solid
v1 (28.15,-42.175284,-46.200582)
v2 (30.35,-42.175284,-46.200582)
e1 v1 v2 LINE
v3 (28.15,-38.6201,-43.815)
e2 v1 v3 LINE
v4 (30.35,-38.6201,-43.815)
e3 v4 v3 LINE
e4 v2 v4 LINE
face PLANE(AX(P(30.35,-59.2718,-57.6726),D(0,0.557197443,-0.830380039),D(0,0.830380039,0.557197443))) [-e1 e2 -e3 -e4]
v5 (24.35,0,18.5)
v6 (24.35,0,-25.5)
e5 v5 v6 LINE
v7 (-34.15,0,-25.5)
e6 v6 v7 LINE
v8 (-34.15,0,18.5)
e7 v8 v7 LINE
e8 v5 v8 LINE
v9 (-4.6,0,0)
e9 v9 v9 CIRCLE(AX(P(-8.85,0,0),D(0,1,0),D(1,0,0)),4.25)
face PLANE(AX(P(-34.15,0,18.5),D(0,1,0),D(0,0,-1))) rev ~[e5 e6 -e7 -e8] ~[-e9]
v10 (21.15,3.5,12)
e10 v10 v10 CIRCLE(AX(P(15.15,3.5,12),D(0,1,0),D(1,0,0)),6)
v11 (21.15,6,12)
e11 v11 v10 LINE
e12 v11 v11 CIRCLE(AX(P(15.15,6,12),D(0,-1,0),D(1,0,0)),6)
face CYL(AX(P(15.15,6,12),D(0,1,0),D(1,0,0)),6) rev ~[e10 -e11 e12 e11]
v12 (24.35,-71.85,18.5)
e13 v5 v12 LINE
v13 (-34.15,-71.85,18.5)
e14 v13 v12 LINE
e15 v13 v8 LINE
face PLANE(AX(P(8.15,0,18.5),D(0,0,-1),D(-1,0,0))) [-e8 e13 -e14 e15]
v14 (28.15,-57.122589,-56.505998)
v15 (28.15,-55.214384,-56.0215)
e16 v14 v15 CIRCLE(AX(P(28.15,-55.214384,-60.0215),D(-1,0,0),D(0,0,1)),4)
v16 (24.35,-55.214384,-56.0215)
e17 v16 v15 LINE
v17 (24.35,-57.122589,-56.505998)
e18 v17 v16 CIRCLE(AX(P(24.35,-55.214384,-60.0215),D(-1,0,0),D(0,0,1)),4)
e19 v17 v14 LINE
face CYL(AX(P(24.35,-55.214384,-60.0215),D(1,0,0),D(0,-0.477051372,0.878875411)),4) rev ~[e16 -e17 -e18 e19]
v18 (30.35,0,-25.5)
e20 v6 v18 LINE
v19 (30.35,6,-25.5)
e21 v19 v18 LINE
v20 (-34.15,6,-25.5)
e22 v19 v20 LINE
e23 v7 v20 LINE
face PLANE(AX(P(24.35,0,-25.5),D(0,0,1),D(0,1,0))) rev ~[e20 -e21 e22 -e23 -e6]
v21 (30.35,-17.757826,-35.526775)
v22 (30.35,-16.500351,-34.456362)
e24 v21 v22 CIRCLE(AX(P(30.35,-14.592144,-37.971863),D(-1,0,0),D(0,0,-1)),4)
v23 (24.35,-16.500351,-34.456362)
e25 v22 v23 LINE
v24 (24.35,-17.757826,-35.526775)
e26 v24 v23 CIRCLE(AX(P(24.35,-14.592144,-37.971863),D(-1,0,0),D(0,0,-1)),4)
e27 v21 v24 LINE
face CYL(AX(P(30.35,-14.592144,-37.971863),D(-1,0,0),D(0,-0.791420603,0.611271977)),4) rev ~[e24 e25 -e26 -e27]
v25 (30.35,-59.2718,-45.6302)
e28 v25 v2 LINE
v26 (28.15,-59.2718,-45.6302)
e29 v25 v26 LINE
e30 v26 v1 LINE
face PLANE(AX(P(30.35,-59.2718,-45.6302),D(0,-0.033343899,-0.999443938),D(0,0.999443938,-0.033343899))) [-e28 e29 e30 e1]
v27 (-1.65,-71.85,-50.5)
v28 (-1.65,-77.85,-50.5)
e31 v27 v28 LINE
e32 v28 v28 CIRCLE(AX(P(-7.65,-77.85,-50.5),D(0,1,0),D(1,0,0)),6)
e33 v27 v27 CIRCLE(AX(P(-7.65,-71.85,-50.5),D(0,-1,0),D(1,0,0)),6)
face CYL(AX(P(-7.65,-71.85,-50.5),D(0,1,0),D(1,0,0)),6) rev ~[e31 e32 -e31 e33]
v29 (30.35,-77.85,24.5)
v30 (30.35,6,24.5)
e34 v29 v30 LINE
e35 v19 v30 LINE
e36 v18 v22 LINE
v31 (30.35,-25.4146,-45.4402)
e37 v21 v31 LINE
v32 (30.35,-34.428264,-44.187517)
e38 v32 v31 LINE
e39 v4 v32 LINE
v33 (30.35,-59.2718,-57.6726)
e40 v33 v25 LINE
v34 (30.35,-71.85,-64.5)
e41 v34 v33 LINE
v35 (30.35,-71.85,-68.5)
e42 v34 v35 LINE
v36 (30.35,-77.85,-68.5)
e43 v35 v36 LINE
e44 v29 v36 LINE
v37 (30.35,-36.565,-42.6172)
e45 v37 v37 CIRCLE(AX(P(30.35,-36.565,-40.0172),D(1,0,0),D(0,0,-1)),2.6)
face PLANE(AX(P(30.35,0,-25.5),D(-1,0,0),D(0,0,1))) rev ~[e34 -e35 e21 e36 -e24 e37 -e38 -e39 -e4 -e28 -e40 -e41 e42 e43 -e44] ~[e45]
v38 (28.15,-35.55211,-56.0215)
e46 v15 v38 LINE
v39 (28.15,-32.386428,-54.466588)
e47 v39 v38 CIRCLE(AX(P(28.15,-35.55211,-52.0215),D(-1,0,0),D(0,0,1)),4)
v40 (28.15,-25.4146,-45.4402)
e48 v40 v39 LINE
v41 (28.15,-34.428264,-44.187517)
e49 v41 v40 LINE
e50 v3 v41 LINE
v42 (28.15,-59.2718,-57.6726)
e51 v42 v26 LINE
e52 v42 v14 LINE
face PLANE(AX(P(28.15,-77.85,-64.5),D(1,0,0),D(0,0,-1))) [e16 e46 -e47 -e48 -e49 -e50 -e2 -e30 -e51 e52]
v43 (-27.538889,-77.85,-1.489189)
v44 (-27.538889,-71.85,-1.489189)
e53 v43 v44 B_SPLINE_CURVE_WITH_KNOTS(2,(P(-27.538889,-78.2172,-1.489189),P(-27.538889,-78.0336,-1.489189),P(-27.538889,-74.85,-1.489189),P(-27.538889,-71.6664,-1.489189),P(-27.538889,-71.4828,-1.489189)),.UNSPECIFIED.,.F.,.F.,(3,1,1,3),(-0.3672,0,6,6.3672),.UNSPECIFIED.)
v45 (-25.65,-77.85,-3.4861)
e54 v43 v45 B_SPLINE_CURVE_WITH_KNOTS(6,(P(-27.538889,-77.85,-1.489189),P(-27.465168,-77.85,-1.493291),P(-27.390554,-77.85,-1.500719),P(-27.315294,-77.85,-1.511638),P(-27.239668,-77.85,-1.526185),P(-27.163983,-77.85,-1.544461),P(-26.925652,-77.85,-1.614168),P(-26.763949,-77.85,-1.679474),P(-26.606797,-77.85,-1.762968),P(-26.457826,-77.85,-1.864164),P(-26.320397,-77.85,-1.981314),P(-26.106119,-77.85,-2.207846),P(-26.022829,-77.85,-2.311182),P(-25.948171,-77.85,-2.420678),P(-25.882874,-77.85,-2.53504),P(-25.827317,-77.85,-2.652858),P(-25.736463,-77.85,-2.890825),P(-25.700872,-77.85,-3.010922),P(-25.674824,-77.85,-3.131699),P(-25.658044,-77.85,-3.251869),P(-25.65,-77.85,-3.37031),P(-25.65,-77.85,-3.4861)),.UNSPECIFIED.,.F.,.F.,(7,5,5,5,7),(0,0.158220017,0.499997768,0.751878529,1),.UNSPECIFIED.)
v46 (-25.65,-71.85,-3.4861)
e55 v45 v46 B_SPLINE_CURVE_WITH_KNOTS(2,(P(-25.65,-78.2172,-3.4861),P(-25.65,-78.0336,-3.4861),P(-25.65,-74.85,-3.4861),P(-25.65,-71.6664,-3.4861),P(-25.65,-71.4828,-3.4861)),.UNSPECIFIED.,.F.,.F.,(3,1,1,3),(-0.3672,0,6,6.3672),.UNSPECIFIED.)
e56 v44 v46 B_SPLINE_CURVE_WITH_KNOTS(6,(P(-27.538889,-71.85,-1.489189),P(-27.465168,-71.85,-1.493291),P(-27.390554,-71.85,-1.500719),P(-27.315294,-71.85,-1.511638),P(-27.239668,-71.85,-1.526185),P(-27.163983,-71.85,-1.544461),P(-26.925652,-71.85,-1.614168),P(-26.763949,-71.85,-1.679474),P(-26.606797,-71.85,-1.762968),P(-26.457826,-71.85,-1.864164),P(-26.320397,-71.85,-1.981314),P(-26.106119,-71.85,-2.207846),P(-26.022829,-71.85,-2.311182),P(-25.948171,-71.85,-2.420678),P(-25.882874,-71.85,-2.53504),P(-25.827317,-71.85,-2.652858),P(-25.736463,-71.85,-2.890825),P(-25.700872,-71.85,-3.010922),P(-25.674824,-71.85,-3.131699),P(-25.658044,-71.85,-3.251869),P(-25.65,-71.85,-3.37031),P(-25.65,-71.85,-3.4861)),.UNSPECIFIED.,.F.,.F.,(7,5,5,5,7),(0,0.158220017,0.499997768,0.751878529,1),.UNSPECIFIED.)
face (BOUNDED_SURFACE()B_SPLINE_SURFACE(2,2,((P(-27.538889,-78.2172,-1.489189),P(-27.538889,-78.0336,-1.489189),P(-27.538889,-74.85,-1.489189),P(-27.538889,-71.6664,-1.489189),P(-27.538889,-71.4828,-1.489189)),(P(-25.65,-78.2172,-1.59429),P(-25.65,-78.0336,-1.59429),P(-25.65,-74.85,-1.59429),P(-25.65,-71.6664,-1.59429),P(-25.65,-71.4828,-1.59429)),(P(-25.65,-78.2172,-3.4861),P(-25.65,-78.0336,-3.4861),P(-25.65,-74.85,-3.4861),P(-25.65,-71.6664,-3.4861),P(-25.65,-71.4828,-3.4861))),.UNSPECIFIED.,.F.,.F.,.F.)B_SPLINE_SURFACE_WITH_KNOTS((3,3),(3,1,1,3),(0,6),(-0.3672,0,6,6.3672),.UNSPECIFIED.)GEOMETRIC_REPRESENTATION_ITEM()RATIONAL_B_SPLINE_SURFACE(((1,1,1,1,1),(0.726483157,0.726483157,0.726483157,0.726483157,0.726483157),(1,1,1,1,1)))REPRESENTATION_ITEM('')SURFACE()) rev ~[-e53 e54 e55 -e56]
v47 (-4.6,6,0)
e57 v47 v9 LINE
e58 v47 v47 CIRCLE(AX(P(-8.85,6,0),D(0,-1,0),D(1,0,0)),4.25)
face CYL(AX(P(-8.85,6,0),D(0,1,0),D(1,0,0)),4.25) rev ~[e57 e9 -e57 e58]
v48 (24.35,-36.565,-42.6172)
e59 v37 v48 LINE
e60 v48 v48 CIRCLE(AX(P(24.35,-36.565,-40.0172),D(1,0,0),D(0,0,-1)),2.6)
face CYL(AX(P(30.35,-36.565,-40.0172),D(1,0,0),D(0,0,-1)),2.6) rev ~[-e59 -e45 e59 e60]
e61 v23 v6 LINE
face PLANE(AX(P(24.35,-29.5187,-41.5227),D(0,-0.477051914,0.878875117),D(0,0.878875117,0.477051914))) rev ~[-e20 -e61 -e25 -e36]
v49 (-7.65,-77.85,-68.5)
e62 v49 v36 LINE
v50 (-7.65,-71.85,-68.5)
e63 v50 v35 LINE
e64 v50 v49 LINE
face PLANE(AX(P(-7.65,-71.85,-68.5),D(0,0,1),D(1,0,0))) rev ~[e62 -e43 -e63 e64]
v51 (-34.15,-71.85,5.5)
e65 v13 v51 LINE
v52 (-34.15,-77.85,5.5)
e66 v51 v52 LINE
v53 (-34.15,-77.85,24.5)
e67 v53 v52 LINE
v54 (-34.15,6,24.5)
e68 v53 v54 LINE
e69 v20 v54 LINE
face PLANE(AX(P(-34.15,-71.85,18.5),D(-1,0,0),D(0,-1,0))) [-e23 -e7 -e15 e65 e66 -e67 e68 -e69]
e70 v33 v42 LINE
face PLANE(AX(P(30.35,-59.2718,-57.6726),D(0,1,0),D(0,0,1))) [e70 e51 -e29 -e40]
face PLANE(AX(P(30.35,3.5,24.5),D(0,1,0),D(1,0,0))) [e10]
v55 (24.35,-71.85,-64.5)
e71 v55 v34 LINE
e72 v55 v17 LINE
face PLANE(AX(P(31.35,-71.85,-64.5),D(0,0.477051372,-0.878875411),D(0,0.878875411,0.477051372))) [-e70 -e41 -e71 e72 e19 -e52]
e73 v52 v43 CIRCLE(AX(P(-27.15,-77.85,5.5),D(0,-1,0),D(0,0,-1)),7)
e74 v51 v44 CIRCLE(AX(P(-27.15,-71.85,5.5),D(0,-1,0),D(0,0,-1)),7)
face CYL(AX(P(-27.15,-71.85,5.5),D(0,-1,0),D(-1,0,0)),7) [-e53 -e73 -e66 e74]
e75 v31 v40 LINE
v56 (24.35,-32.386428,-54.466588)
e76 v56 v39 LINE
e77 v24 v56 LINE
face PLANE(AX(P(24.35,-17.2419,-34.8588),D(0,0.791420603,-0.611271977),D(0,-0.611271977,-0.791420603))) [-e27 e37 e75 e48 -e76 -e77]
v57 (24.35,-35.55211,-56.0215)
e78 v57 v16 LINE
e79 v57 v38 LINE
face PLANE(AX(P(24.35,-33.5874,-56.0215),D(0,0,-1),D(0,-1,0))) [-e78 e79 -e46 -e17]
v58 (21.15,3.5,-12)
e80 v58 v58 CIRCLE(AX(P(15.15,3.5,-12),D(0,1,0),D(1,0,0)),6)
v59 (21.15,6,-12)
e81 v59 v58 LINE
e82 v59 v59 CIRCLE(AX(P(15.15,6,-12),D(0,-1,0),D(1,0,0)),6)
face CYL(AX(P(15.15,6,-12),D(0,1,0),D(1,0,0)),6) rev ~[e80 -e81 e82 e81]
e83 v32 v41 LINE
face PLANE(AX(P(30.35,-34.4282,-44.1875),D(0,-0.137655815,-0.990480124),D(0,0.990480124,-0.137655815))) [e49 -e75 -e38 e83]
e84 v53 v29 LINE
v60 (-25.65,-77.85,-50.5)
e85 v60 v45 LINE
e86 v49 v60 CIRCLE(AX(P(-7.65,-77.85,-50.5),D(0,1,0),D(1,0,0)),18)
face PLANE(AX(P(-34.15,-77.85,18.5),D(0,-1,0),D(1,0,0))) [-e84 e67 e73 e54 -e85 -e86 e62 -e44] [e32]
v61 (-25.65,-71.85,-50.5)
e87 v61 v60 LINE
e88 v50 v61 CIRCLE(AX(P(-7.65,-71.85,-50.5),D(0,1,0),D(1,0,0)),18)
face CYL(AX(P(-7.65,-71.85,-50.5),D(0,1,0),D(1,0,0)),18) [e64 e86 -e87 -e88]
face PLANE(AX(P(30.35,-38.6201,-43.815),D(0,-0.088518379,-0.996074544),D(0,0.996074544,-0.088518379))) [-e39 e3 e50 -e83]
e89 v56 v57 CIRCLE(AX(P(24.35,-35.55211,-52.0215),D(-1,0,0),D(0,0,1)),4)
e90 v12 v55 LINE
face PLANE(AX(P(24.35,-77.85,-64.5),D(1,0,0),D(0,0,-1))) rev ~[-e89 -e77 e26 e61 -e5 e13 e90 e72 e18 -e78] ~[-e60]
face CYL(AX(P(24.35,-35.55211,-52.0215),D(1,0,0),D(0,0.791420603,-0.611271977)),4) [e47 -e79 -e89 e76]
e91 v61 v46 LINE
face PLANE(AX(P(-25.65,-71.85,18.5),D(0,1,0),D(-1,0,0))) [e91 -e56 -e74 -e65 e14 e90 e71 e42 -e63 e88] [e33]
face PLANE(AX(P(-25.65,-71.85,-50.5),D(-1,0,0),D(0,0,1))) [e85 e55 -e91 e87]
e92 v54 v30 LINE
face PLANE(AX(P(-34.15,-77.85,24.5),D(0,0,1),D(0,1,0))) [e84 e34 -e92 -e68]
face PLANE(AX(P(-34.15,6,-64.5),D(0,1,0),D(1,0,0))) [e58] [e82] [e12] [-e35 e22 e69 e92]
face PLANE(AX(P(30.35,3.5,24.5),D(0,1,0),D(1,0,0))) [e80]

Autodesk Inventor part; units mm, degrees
ref_plane "YZ Plane" through (0, 0, 0) normal (1, 0, 0) x (0, 1, 0)
ref_plane "XZ Plane" through (0, 0, 0) normal (0, 1, 0) x (-1, 0, 0)
ref_plane "XY Plane" through (0, 0, 0) normal (0, 0, 1) x (1, 0, 0)
sketch "Sketch1" plane through (0, 0, 0) normal (0, 1, 0) x (-1, 0, 0)
  line L0 (0, -25.5) -> (-34.15, -25.5)
  line L1 (-34.15, -25.5) -> (-34.15, 0)
  line L2 (-34.15, 0) -> (-34.15, 25.5)
  line L3 (-34.15, 25.5) -> (0, 25.5)
  line L4 (0, 25.5) -> (34.15, 25.5)
  line L5 (34.15, 25.5) -> (34.15, 0)
  line L6 (34.15, 0) -> (34.15, -25.5)
  line L7 (34.15, -25.5) -> (0, -25.5)
  point P0 (0, 0)
extrude "Extrusion1" add sketch "Sketch1" along normal blind 7
sketch "Sketch3" plane through (-34.15, 0, 25.5) normal (0, 0, 1) x (1, 0, 0)
  line L0 (0, 0) -> (0, -78.85)
  point P0 (34.15, 0)
  dimension "d7" = 78.85
sketch "Sketch4" plane through (-34.15, 0, -25.5) normal (-1, 0, 0) x (0, 0, 1)
  line L0 (51, 0) -> (51, -78.85)
  line L1 (51, -78.85) -> (-39, -78.85)
  line L2 (-39, -78.85) -> (-39, -71.85)
  line L3 (0, 0) -> (-39, -71.85)
  line L4 (0, 0) -> (51, 0)
  point P0 (25.5, 0)
  dimension "d10" = 90
  dimension "d11" = 7
extrude "Extrusion2" add sketch "Sketch4" against normal blind 7
sketch "Sketch7" plane through (-27.15, 0, -25.5) normal (1, 0, 0) x (0, 0, -1)
  line L0 (-51, -78.85) -> (39, -78.85) projected
  line L1 (-51, -78.85) -> (39, -78.85)
  line L2 (39, -78.85) -> (39, -71.85) projected
  line L3 (39, -78.85) -> (39, -71.85)
  line L4 (39, -71.85) -> (-51, -71.85)
  line L5 (-51, 0) -> (-51, -78.85) projected
  line L6 (-51, -78.85) -> (-51, -71.85)
  point P0 (-25.5, 0)
sketch "Sketch8" plane through (0, 0, 0) normal (0, -1, 0) x (1, 0, 0)
  circle A0 centre (8.15, 0) radius 5 projected
  line L0 (8.15, 18.5) -> (34.15, 18.5)
  line L1 (34.15, 25.5) -> (34.15, -25.5) projected
  line L2 (8.15, 25.5) -> (34.15, 25.5)
  line L3 (8.15, 25.5) -> (-27.15, 25.5)
  line L4 (-27.15, 25.5) -> (-27.15, -25.5) projected
  line L5 (8.15, 18.5) -> (-27.15, 18.5)
  line L6 (34.15, 25.5) -> (34.15, 18.5)
  line L7 (-27.15, 25.5) -> (-27.15, 18.5)
  point P0 (0, 0)
extrude "Extrusion6" add sketch "Sketch7" along normal blind 58.5
extrude "Extrusion7" add sketch "Sketch8" along normal blind 78.75 contours L5 L4 L3 L2 L1 L0
sketch "Sketch9" plane through (31.35, 0, -25.5) normal (1, 0, 0) x (0, 0, -1)
  line L0 (-51, -78.75) -> (-51, 7) projected
  line L1 (-44, 0) -> (-44, -71.85) projected
  line L2 (-51, -78.75) -> (-44, -78.75)
  line L3 (-44, -78.75) -> (-44, -71.85)
  line L4 (-44, -71.85) -> (-51, -71.85)
  line L5 (-51, -71.85) -> (-51, -78.75)
  point P0 (-25.5, 0)
extrude "Extrusion8" cut sketch "Sketch9" along normal blind 10
sketch "Sketch10" plane through (0, 7, 0) normal (0, 1, 0) x (1, 0, 0)
  point P0 (0, 0)
sketch "Boceto11" plane through (-34.15, -78.85, -64.5) normal (0, -1, 0) x (1, 0, 0)
  line L0 (0, 0) -> (65.5, 0) projected
  line L1 (65.5, 89.9985) -> (65.5, 0)
  line L2 (65.5, 0) -> (71.065, 0)
  line L3 (71.065, 0) -> (71.065, 89.9985)
  line L4 (71.065, 89.9985) -> (65.5, 89.9985)
  line L5 (65.5, 89.9985) -> (65.5, 95.8996)
  line L6 (65.5, 95.8996) -> (71.065, 89.9985)
  point P0 (34.15, 64.5)
extrude "Extrusión9" cut sketch "Boceto11" against normal blind 100
sketch "Boceto12" plane through (31.35, 0, -25.5) normal (1, 0, 0) x (0, 0, -1)
  line L0 (-44, 0) -> (-44, -71.85) projected
  line L1 (-44, 0) -> (-44, -71.85)
  line L2 (39, -71.85) -> (39, -78.85) projected
  line L3 (-44, -71.85) -> (39, -71.85)
  line L4 (-44, 0) -> (0, 0) projected
  line L5 (39, -71.85) -> (0, 0)
  line L6 (0, 0) -> (-44, 0)
  point P0 (-25.5, 0)
extrude "Extrusión10" add sketch "Boceto12" against normal blind 7
sketch "Boceto13" plane through (-34.15, 7, -25.5) normal (-1, 0, 0) x (0, 0, 1)
  line L0 (0, -7) -> (0, 0) projected
  line L1 (44, -7) -> (0, -7) projected
  line L2 (0, -7) -> (44, -7)
  line L3 (44, -78.85) -> (-39, -78.85) projected
  line L4 (44, -7) -> (44, -78.85)
  line L5 (44, -78.85) -> (-39, -78.85)
  line L6 (-39, -78.85) -> (0, -7)
  point P0 (25.5, -7)
extrude "Extrusión11" cut sketch "Boceto13" against normal blind 7
sketch "Boceto15" plane through (-34.15, 0, -25.5) normal (0, 0, -1) x (-1, 0, 0)
  point P0 (-34.15, 0)
sketch "Boceto19" plane through (-34.15, -78.85, -64.5) normal (0, -1, 0) x (1, 0, 0)
  line L0 (65.5, 90) -> (65.5, 0) projected
  line L1 (65.5, 0) -> (65.5, 40.9323)
  line L2 (81.7334, 40.9323) -> (65.5, 40.9323)
  line L3 (81.7334, 40.9323) -> (81.7334, 0)
  line L4 (81.7334, 0) -> (65.5, 0)
  point P0 (34.15, 64.5)
extrude "Extrusión17" cut sketch "Boceto19" against normal blind 100
sketch "Boceto20" plane through (24.35, 0, -25.5) normal (-1, 0, 0) x (0, 0, 1)
  line L0 (-29.1839, -53.7657) -> (-27.9516, -53.3206) projected
  line L1 (0, 0) -> (-39, -71.85) projected
  line L2 (-29.1839, -53.7657) -> (-27.8697, -51.3447)
  line L3 (-27.8697, -51.3447) -> (-27.9516, -53.3206) projected
  line L4 (-27.8697, -51.3447) -> (-27.9516, -53.3206)
  line L5 (-27.9516, -53.3206) -> (-29.1839, -53.7657)
  point P0 (25.5, 0)
extrude "Extrusión18" add sketch "Boceto20" against normal blind 7
sketch "Boceto21" plane through (24.35, 0, -25.5) normal (-1, 0, 0) x (0, 0, 1)
  point P0 (25.5, 0)
sketch "Boceto22" plane through (24.35, 0, -25.5) normal (-1, 0, 0) x (0, 0, 1)
  point P0 (25.5, 0)
sketch "Boceto24" plane through (31.35, 0, -25.5) normal (1, 0, 0) x (0, 0, -1)
  point P0 (-25.5, 0)
sketch "Boceto26" plane through (24.35, 0, -25.5) normal (-1, 0, 0) x (0, 0, 1)
  point P0 (25.5, 0)
sketch "Boceto27" plane through (31.35, 0, -25.5) normal (1, 0, 0) x (0, 0, -1)
  line L0 (-51, 7) -> (0, 7) projected
  line L1 (0, 7) -> (16.0227, 7)
  line L2 (16.0227, 7) -> (16.0227, -29.5187)
  line L3 (0, 0) -> (39, -71.85) projected
  line L4 (16.0227, -29.5187) -> (0, 0)
  line L5 (0, 0) -> (0, 7)
  point P0 (-25.5, 0)
extrude "Extrusión22" add sketch "Boceto27" against normal blind 7
sketch "Boceto28" plane through (24.35, 0, -25.5) normal (-1, 0, 0) x (0, 0, 1)
  line L0 (-16.0227, -29.5187) -> (-39, -71.85) projected
  line L1 (-16.0227, -29.5187) -> (0, 0)
  line L2 (0, 7) -> (-16.0227, 7) projected
  line L3 (0, 0) -> (0, 7)
  line L4 (0, 7) -> (-16.0227, 7)
  line L5 (-16.0227, 7) -> (-16.0227, -29.5187) projected
  line L6 (-16.0227, 7) -> (-16.0227, -29.5187)
  point P0 (25.5, 0)
extrude "Extrusión23" cut sketch "Boceto28" against normal blind 7
sketch "Boceto29" plane through (31.35, 0, -25.5) normal (1, 0, 0) x (0, 0, -1)
  point P0 (-25.5, 0)
sketch "Boceto31" plane through (-34.15, -78.85, -64.5) normal (0, 0, -1) x (-1, 0, 0)
  line L0 (0, 7) -> (0, 0) projected
  line L1 (0, 0) -> (0, 1)
  line L2 (0, 1) -> (-65.5, 1)
  line L3 (-65.5, 0) -> (-65.5, 85.85) projected
  line L4 (-65.5, 1) -> (-64.5, 1)
  line L5 (-64.5, 1) -> (-64.5, 85.85)
  line L6 (0, 85.85) -> (-65.5, 85.85) projected
  line L7 (-64.5, 85.85) -> (0, 85.85)
  line L8 (0, 85.85) -> (0, 84.85)
  line L9 (0, 0) -> (0, 85.85) projected
  line L10 (0, 84.85) -> (-64.5, 84.85)
  line L11 (-64.5, 85.85) -> (-65.5, 85.85)
  line L12 (0, 0) -> (-65.5, 0) projected
  line L13 (-65.5, 85.85) -> (-65.5, 0)
  line L14 (-65.5, 0) -> (0, 0)
  point P0 (-34.15, 78.85)
  dimension "d84" = 1
  dimension "d85" = 1
  dimension "d86" = 1
extrude "Extrusión26" cut sketch "Boceto31" against normal blind 1000 contours L0 L12 L3 L2 | L10 L5 L6 L8 | L2 L3 L6 L5
sketch "Boceto32" plane through (-34.15, -71.85, 18.5) normal (-1, 0, 0) x (0, 0, 1)
  line L0 (-83, -6) -> (7, -6) projected
  line L1 (7, -6) -> (6, -6)
  line L2 (6, -6) -> (6, 77.85)
  line L3 (7, 77.85) -> (-44, 77.85) projected
  line L4 (7, -6) -> (7, 77.85) projected
  line L5 (6, 77.85) -> (7, 77.85)
  line L6 (7, 77.85) -> (7, -6)
  point P0 (-18.5, 71.85)
  dimension "d89" = 1
extrude "Extrusión27" cut sketch "Boceto32" against normal blind 100
sketch "Boceto33" plane through (-34.15, 6, -25.5) normal (0, 1, 0) x (1, 0, 0)
  line L0 (0, 0) -> (0, -44) projected
  line L1 (0, 0) -> (0, -25.5)
  line L2 (0, -25.5) -> (25.3, -25.5)
  circle A0 centre (25.3, -25.5) radius 4.25
  point P0 (34.15, -25.5)
  dimension "d92" = 25.5
  dimension "d93" = 25.3
  dimension "d94" = 8.5
extrude "Extrusión28" cut sketch "Boceto33" against normal blind 10
sketch "Boceto34" plane through (30.35, -77.85, -64.5) normal (1, 0, 0) x (0, 0, -1)
  point P0 (-64.5, 77.85)
sketch "Boceto35" plane through (30.35, -77.85, -64.5) normal (1, 0, 0) x (0, 0, -1)
  circle A0 centre (-24.4828, 41.285) radius 2.6
  point P0 (-64.5, 77.85)
  dimension "d101" = 5.2
extrude "Extrusión29" cut sketch "Boceto35" against normal blind 10
sketch "Boceto36" plane through (30.35, -77.85, -64.5) normal (1, 0, 0) x (0, 0, -1)
  point P0 (-64.5, 77.85)
sketch "Boceto37" plane through (30.35, -77.85, -64.5) normal (1, 0, 0) x (0, 0, -1)
  line L0 (-39, 77.85) -> (0, 6) projected
  line L1 (-12.3437, 28.741) -> (-12.3437, 48.1268)
  line L2 (-12.3437, 48.1268) -> (-28.4038, 58.3285)
  line L3 (-12.3437, 28.741) -> (-28.4038, 58.3285)
  point P0 (-64.5, 77.85)
extrude "Extrusión30" add sketch "Boceto37" against normal blind 6
fillet "Empalme3" radius 10 3 edges at (27.35, -29.7232, -52.1563) (27.35, -49.109, -52.1563) (27.35, -19.5215, -36.0962)
sketch "Boceto38" plane through (30.35, -77.85, -64.5) normal (1, 0, 0) x (0, 0, -1)
  point P0 (-64.5, 77.85)
sketch "Boceto39" plane through (30.35, -77.85, -64.5) normal (1, 0, 0) x (0, 0, -1)
  line L0 (-6.8274, 18.5782) -> (-18.8698, 18.5782)
  line L1 (-18.8698, 18.5782) -> (-18.2969, 35.7502)
  line L2 (-18.2969, 35.7502) -> (-20.685, 39.2299)
  line L3 (-20.685, 39.2299) -> (-19.4909, 52.6668)
  line L4 (-26.2143, 56.9377) -> (-16.9818, 51.073) projected
  line L5 (-6.8274, 18.5782) -> (-5.5662, 48.0514)
  line L6 (-5.5662, 48.0514) -> (-19.4909, 52.6668)
  point P0 (-64.5, 77.85)
extrude "Extrusión31" cut sketch "Boceto39" against normal blind 2.2
fillet "Empalme4" radius 10 1 edges at (29.25, -25.1832, -45.0091)
sketch "Boceto40" plane through (24.35, 0, -25.5) normal (-1, 0, 0) x (0, 0, 1)
  line L0 (-26.6563, -35.218) -> (-26.6563, -46.57) projected
  line L1 (-26.6563, -35.218) -> (-24.0221, -30.4862) construction
  arc A0 (-12.7857, -20.9123) -> (-9.3588, -17.2419) centre (-18.1476, -12.4713) ccw projected
  line L2 (-24.0221, -30.4862) -> (-10.7107, -19.1566) construction
  spline S0 degree 2 poles (-26.6563, -35.218) (-24.0221, -30.4862) (-10.7107, -19.1566) knots 1 1 1 2 2 2
  line L3 (-26.6563, -35.218) -> (-10.7107, -35.218)
  line L4 (-10.7107, -35.218) -> (-10.7107, -19.1566)
  line L5 (-10.7107, -19.1566) -> (-26.6563, -19.1566)
  line L6 (-26.6563, -19.1566) -> (-26.6563, -35.218)
  point P0 (25.5, 0)
  point P1 (-10.7107, -19.1566)
extrude "Extrusión32" cut sketch "Boceto40" against normal blind 6 contours S0 L6 L5
fillet "Empalme5" radius 10 1 edges at (26.25, -35.218, -52.1563)
sketch "Boceto41" plane through (-34.15, -71.85, 18.5) normal (0, 1, 0) x (1, 0, 0)
  circle A0 centre (11.5, 71.5) radius 5 projected
  circle A1 centre (11.5, 71.5) radius 6
  line L0 (11.5, 71.5) -> (-12.5, 71.5)
  line L1 (-12.5, 71.5) -> (-12.5, 95.5)
  line L2 (-12.5, 95.5) -> (11.5, 95.5)
  line L3 (11.5, 95.5) -> (11.5, 71.5)
  line L4 (64.5, 76.1726) -> (64.5, 83) projected
  line L5 (64.5, 83) -> (64.5, 95.5)
  line L6 (64.5, 95.5) -> (11.5, 95.5)
  line L7 (0, 83) -> (0, -6) projected
  line L8 (0, -6) -> (-12.5, -6)
  line L9 (-12.5, -6) -> (-12.5, 71.5)
  line L10 (64.5, 83) -> (11.5, 83)
  line L11 (0, 83) -> (58.5, 83) projected
  point P0 (34.15, 18.5)
  dimension "d113" = 12
  dimension "d114" = 24
  dimension "d115" = 24
extrude "Extrusión33" add sketch "Boceto41" against normal blind 6 contours L11 L7 L0 L1 L2 L3 | L3 L6 L5 L10 | L7 L8 L9 L0
sketch "Boceto43" plane through (30.35, 6, 24.5) normal (0, 1, 0) x (1, 0, 0)
  circle A0 centre (-39.2, 24.5) radius 4.25 projected
  line L0 (-39.2, 24.5) -> (-15.2, 24.5)
  line L1 (-15.2, 24.5) -> (-15.2, 12.5)
  line L2 (-15.2, 12.5) -> (-15.2, 36.5)
  circle A1 centre (-15.2, 36.5) radius 6
  circle A2 centre (-15.2, 12.5) radius 6
  point P0 (-30.35, 24.5)
  dimension "d123" = 24
  dimension "d124" = 12
  dimension "d125" = 24
  dimension "d126" = 12
  dimension "d127" = 12
extrude "Extrusión35" cut sketch "Boceto43" against normal blind 2.5 contours A1 | A2
sketch "Boceto44" plane through (24.35, 0, -25.5) normal (-1, 0, 0) x (0, 0, 1)
  line L0 (0, 0) -> (-9.3588, -17.2419) projected
  line L1 (-9.3588, -17.2419) -> (-30.5215, -33.5874)
  line L2 (-30.5215, -33.5874) -> (-30.5215, -56.2301)
  line L3 (-27.8675, -51.3405) -> (-39, -71.85) projected
  arc A0 (-12.666, -20.8351) -> (-9.3588, -17.2419) centre (-18.1476, -12.4713) ccw projected
  line L4 (-30.5215, -56.2301) -> (-9.3588, -17.2419)
  point P0 (25.5, 0)
extrude "Extrusión36" add sketch "Boceto44" against normal blind 6
sketch "Boceto45" plane through (30.35, 0, -25.5) normal (1, 0, 0) x (0, 0, -1)
  line L0 (18.315, -38.6201) -> (18.6875, -34.4282) projected
  line L1 (18.6875, -34.4282) -> (19.9402, -25.4146)
  line L2 (9.3588, -17.2419) -> (30.5215, -33.5874) projected
  line L3 (30.5215, -56.2301) -> (30.5215, -33.5874) projected
  line L4 (19.9402, -25.4146) -> (30.5215, -33.5874)
  line L5 (30.5215, -33.5874) -> (32.1519, -59.2336)
  line L6 (30.5215, -56.2301) -> (39, -71.85) projected
  line L7 (32.1726, -59.2718) -> (20.1302, -59.2718) projected
  line L8 (32.1726, -59.2718) -> (18.315, -38.6201)
  point P0 (-25.5, 0)
extrude "Extrusión37" cut sketch "Boceto45" against normal blind 2.2 contours L0 L1 L2 L3 L6 L8
fillet "Empalme7" radius 4 3 edges at (26.25, -33.5874, -56.0215) (27.35, -17.2419, -34.8588) (26.25, -56.2301, -56.0215)
sketch "Boceto46" plane through (-34.15, -71.85, 18.5) normal (0, 1, 0) x (1, 0, 0)
  line L0 (-12.5, -6) -> (0, -6) projected
  line L1 (0, -6) -> (0, 95.5)
  line L2 (-12.5, 95.5) -> (64.5, 95.5) projected
  line L3 (0, 95.5) -> (-12.5, 95.5)
  line L4 (-12.5, 95.5) -> (-12.5, -6)
  line L5 (-12.5, -6) -> (0, -6)
  point P0 (34.15, 18.5)
extrude "Extrusión38" cut sketch "Boceto46" against normal blind 10
sketch "Boceto47" plane through (-34.15, -71.85, 18.5) normal (0, 1, 0) x (1, 0, 0)
  line L0 (0, 0) -> (0, -6) projected
  line L1 (0, 95.5) -> (26.5, 95.5)
  line L2 (26.5, 95.5) -> (26.5, 69)
  line L3 (26.5, 69) -> (0, 69)
  line L4 (0, 69) -> (0, 95.5)
  circle A0 centre (26.5, 69) radius 6
  point P0 (34.15, 18.5)
  dimension "d137" = 26.5
  dimension "d138" = 26.5
  dimension "d139" = 12
extrude "Extrusión39" cut sketch "Boceto47" against normal blind 10 contours A0 L3 L2 | L2 L3 A0
sketch "Sketch48" plane through (-34.15, -71.85, 18.5) normal (0, 1, 0) x (1, 0, 0)
  circle A0 centre (26.5, 69) radius 6 projected
  line L0 (29.7126, 74.0675) -> (26.5, 69)
  circle A1 centre (26.5, 69) radius 18
  line L1 (8.5, 69) -> (8.5, 0)
  line L2 (0, 0) -> (58.5, 0) projected
  line L3 (0, 0) -> (8.5, 0)
  line L4 (26.5, 87) -> (64.5, 87)
  line L5 (64.5, 83) -> (64.5, 95.5) projected
  line L6 (0, 0) -> (0, 95.5) projected
  line L7 (64.5, 95.5) -> (0, 95.5)
  line L8 (0, 95.5) -> (0, 0)
  point P0 (34.15, 18.5)
  dimension "d142" = 36
extrude "Extrusion40" cut sketch "Sketch48" against normal blind 10 contours A1 L1 L2 L6 L7 L5 L4
sketch "Sketch49" plane through (24.35, 0, 18.5) normal (0, 0, -1) x (-1, 0, 0)
  line L0 (58.5, -77.85) -> (50, -77.85) projected
  line L1 (58.5, -77.85) -> (50, -77.85)
  line L2 (50, -71.85) -> (0, -71.85) projected
  line L3 (50, -77.85) -> (50, -71.85)
  line L4 (50, -71.85) -> (58.5, -71.85)
  line L5 (58.5, -71.85) -> (58.5, -77.85)
  point P0 (24.35, 0)
extrude "Extrusion41" add sketch "Sketch49" along normal blind 20
fillet "Fillet8" radius 7 1 edges at (-34.15, -74.85, -1.5)
fillet "Fillet9" radius 2 1 edges at (-25.65, -74.85, -1.5)
sketch "Sketch50" plane through (28.15, -77.85, -64.5) normal (1, 0, 0) x (0, 0, -1)
  point P0 (-64.5, 77.85)
sketch "Sketch51" plane through (-34.15, -77.85, 24.5) normal (0, -1, 0) x (1, 0, 0)
  line L0 (64.5, -50) -> (64.5, 0) projected
  line L1 (64.5, 0) -> (-39.5, 0)
  line L2 (-39.5, 0) -> (-39.5, -120)
  line L3 (-39.5, -120) -> (64.5, -120)
  line L4 (64.5, -120) -> (64.5, 0)
  point P0 (34.15, -24.5)
  dimension "d149" = 104
  dimension "d150" = 120
properties part number "AC23[i3][L]" material "Aluminio 6061"
